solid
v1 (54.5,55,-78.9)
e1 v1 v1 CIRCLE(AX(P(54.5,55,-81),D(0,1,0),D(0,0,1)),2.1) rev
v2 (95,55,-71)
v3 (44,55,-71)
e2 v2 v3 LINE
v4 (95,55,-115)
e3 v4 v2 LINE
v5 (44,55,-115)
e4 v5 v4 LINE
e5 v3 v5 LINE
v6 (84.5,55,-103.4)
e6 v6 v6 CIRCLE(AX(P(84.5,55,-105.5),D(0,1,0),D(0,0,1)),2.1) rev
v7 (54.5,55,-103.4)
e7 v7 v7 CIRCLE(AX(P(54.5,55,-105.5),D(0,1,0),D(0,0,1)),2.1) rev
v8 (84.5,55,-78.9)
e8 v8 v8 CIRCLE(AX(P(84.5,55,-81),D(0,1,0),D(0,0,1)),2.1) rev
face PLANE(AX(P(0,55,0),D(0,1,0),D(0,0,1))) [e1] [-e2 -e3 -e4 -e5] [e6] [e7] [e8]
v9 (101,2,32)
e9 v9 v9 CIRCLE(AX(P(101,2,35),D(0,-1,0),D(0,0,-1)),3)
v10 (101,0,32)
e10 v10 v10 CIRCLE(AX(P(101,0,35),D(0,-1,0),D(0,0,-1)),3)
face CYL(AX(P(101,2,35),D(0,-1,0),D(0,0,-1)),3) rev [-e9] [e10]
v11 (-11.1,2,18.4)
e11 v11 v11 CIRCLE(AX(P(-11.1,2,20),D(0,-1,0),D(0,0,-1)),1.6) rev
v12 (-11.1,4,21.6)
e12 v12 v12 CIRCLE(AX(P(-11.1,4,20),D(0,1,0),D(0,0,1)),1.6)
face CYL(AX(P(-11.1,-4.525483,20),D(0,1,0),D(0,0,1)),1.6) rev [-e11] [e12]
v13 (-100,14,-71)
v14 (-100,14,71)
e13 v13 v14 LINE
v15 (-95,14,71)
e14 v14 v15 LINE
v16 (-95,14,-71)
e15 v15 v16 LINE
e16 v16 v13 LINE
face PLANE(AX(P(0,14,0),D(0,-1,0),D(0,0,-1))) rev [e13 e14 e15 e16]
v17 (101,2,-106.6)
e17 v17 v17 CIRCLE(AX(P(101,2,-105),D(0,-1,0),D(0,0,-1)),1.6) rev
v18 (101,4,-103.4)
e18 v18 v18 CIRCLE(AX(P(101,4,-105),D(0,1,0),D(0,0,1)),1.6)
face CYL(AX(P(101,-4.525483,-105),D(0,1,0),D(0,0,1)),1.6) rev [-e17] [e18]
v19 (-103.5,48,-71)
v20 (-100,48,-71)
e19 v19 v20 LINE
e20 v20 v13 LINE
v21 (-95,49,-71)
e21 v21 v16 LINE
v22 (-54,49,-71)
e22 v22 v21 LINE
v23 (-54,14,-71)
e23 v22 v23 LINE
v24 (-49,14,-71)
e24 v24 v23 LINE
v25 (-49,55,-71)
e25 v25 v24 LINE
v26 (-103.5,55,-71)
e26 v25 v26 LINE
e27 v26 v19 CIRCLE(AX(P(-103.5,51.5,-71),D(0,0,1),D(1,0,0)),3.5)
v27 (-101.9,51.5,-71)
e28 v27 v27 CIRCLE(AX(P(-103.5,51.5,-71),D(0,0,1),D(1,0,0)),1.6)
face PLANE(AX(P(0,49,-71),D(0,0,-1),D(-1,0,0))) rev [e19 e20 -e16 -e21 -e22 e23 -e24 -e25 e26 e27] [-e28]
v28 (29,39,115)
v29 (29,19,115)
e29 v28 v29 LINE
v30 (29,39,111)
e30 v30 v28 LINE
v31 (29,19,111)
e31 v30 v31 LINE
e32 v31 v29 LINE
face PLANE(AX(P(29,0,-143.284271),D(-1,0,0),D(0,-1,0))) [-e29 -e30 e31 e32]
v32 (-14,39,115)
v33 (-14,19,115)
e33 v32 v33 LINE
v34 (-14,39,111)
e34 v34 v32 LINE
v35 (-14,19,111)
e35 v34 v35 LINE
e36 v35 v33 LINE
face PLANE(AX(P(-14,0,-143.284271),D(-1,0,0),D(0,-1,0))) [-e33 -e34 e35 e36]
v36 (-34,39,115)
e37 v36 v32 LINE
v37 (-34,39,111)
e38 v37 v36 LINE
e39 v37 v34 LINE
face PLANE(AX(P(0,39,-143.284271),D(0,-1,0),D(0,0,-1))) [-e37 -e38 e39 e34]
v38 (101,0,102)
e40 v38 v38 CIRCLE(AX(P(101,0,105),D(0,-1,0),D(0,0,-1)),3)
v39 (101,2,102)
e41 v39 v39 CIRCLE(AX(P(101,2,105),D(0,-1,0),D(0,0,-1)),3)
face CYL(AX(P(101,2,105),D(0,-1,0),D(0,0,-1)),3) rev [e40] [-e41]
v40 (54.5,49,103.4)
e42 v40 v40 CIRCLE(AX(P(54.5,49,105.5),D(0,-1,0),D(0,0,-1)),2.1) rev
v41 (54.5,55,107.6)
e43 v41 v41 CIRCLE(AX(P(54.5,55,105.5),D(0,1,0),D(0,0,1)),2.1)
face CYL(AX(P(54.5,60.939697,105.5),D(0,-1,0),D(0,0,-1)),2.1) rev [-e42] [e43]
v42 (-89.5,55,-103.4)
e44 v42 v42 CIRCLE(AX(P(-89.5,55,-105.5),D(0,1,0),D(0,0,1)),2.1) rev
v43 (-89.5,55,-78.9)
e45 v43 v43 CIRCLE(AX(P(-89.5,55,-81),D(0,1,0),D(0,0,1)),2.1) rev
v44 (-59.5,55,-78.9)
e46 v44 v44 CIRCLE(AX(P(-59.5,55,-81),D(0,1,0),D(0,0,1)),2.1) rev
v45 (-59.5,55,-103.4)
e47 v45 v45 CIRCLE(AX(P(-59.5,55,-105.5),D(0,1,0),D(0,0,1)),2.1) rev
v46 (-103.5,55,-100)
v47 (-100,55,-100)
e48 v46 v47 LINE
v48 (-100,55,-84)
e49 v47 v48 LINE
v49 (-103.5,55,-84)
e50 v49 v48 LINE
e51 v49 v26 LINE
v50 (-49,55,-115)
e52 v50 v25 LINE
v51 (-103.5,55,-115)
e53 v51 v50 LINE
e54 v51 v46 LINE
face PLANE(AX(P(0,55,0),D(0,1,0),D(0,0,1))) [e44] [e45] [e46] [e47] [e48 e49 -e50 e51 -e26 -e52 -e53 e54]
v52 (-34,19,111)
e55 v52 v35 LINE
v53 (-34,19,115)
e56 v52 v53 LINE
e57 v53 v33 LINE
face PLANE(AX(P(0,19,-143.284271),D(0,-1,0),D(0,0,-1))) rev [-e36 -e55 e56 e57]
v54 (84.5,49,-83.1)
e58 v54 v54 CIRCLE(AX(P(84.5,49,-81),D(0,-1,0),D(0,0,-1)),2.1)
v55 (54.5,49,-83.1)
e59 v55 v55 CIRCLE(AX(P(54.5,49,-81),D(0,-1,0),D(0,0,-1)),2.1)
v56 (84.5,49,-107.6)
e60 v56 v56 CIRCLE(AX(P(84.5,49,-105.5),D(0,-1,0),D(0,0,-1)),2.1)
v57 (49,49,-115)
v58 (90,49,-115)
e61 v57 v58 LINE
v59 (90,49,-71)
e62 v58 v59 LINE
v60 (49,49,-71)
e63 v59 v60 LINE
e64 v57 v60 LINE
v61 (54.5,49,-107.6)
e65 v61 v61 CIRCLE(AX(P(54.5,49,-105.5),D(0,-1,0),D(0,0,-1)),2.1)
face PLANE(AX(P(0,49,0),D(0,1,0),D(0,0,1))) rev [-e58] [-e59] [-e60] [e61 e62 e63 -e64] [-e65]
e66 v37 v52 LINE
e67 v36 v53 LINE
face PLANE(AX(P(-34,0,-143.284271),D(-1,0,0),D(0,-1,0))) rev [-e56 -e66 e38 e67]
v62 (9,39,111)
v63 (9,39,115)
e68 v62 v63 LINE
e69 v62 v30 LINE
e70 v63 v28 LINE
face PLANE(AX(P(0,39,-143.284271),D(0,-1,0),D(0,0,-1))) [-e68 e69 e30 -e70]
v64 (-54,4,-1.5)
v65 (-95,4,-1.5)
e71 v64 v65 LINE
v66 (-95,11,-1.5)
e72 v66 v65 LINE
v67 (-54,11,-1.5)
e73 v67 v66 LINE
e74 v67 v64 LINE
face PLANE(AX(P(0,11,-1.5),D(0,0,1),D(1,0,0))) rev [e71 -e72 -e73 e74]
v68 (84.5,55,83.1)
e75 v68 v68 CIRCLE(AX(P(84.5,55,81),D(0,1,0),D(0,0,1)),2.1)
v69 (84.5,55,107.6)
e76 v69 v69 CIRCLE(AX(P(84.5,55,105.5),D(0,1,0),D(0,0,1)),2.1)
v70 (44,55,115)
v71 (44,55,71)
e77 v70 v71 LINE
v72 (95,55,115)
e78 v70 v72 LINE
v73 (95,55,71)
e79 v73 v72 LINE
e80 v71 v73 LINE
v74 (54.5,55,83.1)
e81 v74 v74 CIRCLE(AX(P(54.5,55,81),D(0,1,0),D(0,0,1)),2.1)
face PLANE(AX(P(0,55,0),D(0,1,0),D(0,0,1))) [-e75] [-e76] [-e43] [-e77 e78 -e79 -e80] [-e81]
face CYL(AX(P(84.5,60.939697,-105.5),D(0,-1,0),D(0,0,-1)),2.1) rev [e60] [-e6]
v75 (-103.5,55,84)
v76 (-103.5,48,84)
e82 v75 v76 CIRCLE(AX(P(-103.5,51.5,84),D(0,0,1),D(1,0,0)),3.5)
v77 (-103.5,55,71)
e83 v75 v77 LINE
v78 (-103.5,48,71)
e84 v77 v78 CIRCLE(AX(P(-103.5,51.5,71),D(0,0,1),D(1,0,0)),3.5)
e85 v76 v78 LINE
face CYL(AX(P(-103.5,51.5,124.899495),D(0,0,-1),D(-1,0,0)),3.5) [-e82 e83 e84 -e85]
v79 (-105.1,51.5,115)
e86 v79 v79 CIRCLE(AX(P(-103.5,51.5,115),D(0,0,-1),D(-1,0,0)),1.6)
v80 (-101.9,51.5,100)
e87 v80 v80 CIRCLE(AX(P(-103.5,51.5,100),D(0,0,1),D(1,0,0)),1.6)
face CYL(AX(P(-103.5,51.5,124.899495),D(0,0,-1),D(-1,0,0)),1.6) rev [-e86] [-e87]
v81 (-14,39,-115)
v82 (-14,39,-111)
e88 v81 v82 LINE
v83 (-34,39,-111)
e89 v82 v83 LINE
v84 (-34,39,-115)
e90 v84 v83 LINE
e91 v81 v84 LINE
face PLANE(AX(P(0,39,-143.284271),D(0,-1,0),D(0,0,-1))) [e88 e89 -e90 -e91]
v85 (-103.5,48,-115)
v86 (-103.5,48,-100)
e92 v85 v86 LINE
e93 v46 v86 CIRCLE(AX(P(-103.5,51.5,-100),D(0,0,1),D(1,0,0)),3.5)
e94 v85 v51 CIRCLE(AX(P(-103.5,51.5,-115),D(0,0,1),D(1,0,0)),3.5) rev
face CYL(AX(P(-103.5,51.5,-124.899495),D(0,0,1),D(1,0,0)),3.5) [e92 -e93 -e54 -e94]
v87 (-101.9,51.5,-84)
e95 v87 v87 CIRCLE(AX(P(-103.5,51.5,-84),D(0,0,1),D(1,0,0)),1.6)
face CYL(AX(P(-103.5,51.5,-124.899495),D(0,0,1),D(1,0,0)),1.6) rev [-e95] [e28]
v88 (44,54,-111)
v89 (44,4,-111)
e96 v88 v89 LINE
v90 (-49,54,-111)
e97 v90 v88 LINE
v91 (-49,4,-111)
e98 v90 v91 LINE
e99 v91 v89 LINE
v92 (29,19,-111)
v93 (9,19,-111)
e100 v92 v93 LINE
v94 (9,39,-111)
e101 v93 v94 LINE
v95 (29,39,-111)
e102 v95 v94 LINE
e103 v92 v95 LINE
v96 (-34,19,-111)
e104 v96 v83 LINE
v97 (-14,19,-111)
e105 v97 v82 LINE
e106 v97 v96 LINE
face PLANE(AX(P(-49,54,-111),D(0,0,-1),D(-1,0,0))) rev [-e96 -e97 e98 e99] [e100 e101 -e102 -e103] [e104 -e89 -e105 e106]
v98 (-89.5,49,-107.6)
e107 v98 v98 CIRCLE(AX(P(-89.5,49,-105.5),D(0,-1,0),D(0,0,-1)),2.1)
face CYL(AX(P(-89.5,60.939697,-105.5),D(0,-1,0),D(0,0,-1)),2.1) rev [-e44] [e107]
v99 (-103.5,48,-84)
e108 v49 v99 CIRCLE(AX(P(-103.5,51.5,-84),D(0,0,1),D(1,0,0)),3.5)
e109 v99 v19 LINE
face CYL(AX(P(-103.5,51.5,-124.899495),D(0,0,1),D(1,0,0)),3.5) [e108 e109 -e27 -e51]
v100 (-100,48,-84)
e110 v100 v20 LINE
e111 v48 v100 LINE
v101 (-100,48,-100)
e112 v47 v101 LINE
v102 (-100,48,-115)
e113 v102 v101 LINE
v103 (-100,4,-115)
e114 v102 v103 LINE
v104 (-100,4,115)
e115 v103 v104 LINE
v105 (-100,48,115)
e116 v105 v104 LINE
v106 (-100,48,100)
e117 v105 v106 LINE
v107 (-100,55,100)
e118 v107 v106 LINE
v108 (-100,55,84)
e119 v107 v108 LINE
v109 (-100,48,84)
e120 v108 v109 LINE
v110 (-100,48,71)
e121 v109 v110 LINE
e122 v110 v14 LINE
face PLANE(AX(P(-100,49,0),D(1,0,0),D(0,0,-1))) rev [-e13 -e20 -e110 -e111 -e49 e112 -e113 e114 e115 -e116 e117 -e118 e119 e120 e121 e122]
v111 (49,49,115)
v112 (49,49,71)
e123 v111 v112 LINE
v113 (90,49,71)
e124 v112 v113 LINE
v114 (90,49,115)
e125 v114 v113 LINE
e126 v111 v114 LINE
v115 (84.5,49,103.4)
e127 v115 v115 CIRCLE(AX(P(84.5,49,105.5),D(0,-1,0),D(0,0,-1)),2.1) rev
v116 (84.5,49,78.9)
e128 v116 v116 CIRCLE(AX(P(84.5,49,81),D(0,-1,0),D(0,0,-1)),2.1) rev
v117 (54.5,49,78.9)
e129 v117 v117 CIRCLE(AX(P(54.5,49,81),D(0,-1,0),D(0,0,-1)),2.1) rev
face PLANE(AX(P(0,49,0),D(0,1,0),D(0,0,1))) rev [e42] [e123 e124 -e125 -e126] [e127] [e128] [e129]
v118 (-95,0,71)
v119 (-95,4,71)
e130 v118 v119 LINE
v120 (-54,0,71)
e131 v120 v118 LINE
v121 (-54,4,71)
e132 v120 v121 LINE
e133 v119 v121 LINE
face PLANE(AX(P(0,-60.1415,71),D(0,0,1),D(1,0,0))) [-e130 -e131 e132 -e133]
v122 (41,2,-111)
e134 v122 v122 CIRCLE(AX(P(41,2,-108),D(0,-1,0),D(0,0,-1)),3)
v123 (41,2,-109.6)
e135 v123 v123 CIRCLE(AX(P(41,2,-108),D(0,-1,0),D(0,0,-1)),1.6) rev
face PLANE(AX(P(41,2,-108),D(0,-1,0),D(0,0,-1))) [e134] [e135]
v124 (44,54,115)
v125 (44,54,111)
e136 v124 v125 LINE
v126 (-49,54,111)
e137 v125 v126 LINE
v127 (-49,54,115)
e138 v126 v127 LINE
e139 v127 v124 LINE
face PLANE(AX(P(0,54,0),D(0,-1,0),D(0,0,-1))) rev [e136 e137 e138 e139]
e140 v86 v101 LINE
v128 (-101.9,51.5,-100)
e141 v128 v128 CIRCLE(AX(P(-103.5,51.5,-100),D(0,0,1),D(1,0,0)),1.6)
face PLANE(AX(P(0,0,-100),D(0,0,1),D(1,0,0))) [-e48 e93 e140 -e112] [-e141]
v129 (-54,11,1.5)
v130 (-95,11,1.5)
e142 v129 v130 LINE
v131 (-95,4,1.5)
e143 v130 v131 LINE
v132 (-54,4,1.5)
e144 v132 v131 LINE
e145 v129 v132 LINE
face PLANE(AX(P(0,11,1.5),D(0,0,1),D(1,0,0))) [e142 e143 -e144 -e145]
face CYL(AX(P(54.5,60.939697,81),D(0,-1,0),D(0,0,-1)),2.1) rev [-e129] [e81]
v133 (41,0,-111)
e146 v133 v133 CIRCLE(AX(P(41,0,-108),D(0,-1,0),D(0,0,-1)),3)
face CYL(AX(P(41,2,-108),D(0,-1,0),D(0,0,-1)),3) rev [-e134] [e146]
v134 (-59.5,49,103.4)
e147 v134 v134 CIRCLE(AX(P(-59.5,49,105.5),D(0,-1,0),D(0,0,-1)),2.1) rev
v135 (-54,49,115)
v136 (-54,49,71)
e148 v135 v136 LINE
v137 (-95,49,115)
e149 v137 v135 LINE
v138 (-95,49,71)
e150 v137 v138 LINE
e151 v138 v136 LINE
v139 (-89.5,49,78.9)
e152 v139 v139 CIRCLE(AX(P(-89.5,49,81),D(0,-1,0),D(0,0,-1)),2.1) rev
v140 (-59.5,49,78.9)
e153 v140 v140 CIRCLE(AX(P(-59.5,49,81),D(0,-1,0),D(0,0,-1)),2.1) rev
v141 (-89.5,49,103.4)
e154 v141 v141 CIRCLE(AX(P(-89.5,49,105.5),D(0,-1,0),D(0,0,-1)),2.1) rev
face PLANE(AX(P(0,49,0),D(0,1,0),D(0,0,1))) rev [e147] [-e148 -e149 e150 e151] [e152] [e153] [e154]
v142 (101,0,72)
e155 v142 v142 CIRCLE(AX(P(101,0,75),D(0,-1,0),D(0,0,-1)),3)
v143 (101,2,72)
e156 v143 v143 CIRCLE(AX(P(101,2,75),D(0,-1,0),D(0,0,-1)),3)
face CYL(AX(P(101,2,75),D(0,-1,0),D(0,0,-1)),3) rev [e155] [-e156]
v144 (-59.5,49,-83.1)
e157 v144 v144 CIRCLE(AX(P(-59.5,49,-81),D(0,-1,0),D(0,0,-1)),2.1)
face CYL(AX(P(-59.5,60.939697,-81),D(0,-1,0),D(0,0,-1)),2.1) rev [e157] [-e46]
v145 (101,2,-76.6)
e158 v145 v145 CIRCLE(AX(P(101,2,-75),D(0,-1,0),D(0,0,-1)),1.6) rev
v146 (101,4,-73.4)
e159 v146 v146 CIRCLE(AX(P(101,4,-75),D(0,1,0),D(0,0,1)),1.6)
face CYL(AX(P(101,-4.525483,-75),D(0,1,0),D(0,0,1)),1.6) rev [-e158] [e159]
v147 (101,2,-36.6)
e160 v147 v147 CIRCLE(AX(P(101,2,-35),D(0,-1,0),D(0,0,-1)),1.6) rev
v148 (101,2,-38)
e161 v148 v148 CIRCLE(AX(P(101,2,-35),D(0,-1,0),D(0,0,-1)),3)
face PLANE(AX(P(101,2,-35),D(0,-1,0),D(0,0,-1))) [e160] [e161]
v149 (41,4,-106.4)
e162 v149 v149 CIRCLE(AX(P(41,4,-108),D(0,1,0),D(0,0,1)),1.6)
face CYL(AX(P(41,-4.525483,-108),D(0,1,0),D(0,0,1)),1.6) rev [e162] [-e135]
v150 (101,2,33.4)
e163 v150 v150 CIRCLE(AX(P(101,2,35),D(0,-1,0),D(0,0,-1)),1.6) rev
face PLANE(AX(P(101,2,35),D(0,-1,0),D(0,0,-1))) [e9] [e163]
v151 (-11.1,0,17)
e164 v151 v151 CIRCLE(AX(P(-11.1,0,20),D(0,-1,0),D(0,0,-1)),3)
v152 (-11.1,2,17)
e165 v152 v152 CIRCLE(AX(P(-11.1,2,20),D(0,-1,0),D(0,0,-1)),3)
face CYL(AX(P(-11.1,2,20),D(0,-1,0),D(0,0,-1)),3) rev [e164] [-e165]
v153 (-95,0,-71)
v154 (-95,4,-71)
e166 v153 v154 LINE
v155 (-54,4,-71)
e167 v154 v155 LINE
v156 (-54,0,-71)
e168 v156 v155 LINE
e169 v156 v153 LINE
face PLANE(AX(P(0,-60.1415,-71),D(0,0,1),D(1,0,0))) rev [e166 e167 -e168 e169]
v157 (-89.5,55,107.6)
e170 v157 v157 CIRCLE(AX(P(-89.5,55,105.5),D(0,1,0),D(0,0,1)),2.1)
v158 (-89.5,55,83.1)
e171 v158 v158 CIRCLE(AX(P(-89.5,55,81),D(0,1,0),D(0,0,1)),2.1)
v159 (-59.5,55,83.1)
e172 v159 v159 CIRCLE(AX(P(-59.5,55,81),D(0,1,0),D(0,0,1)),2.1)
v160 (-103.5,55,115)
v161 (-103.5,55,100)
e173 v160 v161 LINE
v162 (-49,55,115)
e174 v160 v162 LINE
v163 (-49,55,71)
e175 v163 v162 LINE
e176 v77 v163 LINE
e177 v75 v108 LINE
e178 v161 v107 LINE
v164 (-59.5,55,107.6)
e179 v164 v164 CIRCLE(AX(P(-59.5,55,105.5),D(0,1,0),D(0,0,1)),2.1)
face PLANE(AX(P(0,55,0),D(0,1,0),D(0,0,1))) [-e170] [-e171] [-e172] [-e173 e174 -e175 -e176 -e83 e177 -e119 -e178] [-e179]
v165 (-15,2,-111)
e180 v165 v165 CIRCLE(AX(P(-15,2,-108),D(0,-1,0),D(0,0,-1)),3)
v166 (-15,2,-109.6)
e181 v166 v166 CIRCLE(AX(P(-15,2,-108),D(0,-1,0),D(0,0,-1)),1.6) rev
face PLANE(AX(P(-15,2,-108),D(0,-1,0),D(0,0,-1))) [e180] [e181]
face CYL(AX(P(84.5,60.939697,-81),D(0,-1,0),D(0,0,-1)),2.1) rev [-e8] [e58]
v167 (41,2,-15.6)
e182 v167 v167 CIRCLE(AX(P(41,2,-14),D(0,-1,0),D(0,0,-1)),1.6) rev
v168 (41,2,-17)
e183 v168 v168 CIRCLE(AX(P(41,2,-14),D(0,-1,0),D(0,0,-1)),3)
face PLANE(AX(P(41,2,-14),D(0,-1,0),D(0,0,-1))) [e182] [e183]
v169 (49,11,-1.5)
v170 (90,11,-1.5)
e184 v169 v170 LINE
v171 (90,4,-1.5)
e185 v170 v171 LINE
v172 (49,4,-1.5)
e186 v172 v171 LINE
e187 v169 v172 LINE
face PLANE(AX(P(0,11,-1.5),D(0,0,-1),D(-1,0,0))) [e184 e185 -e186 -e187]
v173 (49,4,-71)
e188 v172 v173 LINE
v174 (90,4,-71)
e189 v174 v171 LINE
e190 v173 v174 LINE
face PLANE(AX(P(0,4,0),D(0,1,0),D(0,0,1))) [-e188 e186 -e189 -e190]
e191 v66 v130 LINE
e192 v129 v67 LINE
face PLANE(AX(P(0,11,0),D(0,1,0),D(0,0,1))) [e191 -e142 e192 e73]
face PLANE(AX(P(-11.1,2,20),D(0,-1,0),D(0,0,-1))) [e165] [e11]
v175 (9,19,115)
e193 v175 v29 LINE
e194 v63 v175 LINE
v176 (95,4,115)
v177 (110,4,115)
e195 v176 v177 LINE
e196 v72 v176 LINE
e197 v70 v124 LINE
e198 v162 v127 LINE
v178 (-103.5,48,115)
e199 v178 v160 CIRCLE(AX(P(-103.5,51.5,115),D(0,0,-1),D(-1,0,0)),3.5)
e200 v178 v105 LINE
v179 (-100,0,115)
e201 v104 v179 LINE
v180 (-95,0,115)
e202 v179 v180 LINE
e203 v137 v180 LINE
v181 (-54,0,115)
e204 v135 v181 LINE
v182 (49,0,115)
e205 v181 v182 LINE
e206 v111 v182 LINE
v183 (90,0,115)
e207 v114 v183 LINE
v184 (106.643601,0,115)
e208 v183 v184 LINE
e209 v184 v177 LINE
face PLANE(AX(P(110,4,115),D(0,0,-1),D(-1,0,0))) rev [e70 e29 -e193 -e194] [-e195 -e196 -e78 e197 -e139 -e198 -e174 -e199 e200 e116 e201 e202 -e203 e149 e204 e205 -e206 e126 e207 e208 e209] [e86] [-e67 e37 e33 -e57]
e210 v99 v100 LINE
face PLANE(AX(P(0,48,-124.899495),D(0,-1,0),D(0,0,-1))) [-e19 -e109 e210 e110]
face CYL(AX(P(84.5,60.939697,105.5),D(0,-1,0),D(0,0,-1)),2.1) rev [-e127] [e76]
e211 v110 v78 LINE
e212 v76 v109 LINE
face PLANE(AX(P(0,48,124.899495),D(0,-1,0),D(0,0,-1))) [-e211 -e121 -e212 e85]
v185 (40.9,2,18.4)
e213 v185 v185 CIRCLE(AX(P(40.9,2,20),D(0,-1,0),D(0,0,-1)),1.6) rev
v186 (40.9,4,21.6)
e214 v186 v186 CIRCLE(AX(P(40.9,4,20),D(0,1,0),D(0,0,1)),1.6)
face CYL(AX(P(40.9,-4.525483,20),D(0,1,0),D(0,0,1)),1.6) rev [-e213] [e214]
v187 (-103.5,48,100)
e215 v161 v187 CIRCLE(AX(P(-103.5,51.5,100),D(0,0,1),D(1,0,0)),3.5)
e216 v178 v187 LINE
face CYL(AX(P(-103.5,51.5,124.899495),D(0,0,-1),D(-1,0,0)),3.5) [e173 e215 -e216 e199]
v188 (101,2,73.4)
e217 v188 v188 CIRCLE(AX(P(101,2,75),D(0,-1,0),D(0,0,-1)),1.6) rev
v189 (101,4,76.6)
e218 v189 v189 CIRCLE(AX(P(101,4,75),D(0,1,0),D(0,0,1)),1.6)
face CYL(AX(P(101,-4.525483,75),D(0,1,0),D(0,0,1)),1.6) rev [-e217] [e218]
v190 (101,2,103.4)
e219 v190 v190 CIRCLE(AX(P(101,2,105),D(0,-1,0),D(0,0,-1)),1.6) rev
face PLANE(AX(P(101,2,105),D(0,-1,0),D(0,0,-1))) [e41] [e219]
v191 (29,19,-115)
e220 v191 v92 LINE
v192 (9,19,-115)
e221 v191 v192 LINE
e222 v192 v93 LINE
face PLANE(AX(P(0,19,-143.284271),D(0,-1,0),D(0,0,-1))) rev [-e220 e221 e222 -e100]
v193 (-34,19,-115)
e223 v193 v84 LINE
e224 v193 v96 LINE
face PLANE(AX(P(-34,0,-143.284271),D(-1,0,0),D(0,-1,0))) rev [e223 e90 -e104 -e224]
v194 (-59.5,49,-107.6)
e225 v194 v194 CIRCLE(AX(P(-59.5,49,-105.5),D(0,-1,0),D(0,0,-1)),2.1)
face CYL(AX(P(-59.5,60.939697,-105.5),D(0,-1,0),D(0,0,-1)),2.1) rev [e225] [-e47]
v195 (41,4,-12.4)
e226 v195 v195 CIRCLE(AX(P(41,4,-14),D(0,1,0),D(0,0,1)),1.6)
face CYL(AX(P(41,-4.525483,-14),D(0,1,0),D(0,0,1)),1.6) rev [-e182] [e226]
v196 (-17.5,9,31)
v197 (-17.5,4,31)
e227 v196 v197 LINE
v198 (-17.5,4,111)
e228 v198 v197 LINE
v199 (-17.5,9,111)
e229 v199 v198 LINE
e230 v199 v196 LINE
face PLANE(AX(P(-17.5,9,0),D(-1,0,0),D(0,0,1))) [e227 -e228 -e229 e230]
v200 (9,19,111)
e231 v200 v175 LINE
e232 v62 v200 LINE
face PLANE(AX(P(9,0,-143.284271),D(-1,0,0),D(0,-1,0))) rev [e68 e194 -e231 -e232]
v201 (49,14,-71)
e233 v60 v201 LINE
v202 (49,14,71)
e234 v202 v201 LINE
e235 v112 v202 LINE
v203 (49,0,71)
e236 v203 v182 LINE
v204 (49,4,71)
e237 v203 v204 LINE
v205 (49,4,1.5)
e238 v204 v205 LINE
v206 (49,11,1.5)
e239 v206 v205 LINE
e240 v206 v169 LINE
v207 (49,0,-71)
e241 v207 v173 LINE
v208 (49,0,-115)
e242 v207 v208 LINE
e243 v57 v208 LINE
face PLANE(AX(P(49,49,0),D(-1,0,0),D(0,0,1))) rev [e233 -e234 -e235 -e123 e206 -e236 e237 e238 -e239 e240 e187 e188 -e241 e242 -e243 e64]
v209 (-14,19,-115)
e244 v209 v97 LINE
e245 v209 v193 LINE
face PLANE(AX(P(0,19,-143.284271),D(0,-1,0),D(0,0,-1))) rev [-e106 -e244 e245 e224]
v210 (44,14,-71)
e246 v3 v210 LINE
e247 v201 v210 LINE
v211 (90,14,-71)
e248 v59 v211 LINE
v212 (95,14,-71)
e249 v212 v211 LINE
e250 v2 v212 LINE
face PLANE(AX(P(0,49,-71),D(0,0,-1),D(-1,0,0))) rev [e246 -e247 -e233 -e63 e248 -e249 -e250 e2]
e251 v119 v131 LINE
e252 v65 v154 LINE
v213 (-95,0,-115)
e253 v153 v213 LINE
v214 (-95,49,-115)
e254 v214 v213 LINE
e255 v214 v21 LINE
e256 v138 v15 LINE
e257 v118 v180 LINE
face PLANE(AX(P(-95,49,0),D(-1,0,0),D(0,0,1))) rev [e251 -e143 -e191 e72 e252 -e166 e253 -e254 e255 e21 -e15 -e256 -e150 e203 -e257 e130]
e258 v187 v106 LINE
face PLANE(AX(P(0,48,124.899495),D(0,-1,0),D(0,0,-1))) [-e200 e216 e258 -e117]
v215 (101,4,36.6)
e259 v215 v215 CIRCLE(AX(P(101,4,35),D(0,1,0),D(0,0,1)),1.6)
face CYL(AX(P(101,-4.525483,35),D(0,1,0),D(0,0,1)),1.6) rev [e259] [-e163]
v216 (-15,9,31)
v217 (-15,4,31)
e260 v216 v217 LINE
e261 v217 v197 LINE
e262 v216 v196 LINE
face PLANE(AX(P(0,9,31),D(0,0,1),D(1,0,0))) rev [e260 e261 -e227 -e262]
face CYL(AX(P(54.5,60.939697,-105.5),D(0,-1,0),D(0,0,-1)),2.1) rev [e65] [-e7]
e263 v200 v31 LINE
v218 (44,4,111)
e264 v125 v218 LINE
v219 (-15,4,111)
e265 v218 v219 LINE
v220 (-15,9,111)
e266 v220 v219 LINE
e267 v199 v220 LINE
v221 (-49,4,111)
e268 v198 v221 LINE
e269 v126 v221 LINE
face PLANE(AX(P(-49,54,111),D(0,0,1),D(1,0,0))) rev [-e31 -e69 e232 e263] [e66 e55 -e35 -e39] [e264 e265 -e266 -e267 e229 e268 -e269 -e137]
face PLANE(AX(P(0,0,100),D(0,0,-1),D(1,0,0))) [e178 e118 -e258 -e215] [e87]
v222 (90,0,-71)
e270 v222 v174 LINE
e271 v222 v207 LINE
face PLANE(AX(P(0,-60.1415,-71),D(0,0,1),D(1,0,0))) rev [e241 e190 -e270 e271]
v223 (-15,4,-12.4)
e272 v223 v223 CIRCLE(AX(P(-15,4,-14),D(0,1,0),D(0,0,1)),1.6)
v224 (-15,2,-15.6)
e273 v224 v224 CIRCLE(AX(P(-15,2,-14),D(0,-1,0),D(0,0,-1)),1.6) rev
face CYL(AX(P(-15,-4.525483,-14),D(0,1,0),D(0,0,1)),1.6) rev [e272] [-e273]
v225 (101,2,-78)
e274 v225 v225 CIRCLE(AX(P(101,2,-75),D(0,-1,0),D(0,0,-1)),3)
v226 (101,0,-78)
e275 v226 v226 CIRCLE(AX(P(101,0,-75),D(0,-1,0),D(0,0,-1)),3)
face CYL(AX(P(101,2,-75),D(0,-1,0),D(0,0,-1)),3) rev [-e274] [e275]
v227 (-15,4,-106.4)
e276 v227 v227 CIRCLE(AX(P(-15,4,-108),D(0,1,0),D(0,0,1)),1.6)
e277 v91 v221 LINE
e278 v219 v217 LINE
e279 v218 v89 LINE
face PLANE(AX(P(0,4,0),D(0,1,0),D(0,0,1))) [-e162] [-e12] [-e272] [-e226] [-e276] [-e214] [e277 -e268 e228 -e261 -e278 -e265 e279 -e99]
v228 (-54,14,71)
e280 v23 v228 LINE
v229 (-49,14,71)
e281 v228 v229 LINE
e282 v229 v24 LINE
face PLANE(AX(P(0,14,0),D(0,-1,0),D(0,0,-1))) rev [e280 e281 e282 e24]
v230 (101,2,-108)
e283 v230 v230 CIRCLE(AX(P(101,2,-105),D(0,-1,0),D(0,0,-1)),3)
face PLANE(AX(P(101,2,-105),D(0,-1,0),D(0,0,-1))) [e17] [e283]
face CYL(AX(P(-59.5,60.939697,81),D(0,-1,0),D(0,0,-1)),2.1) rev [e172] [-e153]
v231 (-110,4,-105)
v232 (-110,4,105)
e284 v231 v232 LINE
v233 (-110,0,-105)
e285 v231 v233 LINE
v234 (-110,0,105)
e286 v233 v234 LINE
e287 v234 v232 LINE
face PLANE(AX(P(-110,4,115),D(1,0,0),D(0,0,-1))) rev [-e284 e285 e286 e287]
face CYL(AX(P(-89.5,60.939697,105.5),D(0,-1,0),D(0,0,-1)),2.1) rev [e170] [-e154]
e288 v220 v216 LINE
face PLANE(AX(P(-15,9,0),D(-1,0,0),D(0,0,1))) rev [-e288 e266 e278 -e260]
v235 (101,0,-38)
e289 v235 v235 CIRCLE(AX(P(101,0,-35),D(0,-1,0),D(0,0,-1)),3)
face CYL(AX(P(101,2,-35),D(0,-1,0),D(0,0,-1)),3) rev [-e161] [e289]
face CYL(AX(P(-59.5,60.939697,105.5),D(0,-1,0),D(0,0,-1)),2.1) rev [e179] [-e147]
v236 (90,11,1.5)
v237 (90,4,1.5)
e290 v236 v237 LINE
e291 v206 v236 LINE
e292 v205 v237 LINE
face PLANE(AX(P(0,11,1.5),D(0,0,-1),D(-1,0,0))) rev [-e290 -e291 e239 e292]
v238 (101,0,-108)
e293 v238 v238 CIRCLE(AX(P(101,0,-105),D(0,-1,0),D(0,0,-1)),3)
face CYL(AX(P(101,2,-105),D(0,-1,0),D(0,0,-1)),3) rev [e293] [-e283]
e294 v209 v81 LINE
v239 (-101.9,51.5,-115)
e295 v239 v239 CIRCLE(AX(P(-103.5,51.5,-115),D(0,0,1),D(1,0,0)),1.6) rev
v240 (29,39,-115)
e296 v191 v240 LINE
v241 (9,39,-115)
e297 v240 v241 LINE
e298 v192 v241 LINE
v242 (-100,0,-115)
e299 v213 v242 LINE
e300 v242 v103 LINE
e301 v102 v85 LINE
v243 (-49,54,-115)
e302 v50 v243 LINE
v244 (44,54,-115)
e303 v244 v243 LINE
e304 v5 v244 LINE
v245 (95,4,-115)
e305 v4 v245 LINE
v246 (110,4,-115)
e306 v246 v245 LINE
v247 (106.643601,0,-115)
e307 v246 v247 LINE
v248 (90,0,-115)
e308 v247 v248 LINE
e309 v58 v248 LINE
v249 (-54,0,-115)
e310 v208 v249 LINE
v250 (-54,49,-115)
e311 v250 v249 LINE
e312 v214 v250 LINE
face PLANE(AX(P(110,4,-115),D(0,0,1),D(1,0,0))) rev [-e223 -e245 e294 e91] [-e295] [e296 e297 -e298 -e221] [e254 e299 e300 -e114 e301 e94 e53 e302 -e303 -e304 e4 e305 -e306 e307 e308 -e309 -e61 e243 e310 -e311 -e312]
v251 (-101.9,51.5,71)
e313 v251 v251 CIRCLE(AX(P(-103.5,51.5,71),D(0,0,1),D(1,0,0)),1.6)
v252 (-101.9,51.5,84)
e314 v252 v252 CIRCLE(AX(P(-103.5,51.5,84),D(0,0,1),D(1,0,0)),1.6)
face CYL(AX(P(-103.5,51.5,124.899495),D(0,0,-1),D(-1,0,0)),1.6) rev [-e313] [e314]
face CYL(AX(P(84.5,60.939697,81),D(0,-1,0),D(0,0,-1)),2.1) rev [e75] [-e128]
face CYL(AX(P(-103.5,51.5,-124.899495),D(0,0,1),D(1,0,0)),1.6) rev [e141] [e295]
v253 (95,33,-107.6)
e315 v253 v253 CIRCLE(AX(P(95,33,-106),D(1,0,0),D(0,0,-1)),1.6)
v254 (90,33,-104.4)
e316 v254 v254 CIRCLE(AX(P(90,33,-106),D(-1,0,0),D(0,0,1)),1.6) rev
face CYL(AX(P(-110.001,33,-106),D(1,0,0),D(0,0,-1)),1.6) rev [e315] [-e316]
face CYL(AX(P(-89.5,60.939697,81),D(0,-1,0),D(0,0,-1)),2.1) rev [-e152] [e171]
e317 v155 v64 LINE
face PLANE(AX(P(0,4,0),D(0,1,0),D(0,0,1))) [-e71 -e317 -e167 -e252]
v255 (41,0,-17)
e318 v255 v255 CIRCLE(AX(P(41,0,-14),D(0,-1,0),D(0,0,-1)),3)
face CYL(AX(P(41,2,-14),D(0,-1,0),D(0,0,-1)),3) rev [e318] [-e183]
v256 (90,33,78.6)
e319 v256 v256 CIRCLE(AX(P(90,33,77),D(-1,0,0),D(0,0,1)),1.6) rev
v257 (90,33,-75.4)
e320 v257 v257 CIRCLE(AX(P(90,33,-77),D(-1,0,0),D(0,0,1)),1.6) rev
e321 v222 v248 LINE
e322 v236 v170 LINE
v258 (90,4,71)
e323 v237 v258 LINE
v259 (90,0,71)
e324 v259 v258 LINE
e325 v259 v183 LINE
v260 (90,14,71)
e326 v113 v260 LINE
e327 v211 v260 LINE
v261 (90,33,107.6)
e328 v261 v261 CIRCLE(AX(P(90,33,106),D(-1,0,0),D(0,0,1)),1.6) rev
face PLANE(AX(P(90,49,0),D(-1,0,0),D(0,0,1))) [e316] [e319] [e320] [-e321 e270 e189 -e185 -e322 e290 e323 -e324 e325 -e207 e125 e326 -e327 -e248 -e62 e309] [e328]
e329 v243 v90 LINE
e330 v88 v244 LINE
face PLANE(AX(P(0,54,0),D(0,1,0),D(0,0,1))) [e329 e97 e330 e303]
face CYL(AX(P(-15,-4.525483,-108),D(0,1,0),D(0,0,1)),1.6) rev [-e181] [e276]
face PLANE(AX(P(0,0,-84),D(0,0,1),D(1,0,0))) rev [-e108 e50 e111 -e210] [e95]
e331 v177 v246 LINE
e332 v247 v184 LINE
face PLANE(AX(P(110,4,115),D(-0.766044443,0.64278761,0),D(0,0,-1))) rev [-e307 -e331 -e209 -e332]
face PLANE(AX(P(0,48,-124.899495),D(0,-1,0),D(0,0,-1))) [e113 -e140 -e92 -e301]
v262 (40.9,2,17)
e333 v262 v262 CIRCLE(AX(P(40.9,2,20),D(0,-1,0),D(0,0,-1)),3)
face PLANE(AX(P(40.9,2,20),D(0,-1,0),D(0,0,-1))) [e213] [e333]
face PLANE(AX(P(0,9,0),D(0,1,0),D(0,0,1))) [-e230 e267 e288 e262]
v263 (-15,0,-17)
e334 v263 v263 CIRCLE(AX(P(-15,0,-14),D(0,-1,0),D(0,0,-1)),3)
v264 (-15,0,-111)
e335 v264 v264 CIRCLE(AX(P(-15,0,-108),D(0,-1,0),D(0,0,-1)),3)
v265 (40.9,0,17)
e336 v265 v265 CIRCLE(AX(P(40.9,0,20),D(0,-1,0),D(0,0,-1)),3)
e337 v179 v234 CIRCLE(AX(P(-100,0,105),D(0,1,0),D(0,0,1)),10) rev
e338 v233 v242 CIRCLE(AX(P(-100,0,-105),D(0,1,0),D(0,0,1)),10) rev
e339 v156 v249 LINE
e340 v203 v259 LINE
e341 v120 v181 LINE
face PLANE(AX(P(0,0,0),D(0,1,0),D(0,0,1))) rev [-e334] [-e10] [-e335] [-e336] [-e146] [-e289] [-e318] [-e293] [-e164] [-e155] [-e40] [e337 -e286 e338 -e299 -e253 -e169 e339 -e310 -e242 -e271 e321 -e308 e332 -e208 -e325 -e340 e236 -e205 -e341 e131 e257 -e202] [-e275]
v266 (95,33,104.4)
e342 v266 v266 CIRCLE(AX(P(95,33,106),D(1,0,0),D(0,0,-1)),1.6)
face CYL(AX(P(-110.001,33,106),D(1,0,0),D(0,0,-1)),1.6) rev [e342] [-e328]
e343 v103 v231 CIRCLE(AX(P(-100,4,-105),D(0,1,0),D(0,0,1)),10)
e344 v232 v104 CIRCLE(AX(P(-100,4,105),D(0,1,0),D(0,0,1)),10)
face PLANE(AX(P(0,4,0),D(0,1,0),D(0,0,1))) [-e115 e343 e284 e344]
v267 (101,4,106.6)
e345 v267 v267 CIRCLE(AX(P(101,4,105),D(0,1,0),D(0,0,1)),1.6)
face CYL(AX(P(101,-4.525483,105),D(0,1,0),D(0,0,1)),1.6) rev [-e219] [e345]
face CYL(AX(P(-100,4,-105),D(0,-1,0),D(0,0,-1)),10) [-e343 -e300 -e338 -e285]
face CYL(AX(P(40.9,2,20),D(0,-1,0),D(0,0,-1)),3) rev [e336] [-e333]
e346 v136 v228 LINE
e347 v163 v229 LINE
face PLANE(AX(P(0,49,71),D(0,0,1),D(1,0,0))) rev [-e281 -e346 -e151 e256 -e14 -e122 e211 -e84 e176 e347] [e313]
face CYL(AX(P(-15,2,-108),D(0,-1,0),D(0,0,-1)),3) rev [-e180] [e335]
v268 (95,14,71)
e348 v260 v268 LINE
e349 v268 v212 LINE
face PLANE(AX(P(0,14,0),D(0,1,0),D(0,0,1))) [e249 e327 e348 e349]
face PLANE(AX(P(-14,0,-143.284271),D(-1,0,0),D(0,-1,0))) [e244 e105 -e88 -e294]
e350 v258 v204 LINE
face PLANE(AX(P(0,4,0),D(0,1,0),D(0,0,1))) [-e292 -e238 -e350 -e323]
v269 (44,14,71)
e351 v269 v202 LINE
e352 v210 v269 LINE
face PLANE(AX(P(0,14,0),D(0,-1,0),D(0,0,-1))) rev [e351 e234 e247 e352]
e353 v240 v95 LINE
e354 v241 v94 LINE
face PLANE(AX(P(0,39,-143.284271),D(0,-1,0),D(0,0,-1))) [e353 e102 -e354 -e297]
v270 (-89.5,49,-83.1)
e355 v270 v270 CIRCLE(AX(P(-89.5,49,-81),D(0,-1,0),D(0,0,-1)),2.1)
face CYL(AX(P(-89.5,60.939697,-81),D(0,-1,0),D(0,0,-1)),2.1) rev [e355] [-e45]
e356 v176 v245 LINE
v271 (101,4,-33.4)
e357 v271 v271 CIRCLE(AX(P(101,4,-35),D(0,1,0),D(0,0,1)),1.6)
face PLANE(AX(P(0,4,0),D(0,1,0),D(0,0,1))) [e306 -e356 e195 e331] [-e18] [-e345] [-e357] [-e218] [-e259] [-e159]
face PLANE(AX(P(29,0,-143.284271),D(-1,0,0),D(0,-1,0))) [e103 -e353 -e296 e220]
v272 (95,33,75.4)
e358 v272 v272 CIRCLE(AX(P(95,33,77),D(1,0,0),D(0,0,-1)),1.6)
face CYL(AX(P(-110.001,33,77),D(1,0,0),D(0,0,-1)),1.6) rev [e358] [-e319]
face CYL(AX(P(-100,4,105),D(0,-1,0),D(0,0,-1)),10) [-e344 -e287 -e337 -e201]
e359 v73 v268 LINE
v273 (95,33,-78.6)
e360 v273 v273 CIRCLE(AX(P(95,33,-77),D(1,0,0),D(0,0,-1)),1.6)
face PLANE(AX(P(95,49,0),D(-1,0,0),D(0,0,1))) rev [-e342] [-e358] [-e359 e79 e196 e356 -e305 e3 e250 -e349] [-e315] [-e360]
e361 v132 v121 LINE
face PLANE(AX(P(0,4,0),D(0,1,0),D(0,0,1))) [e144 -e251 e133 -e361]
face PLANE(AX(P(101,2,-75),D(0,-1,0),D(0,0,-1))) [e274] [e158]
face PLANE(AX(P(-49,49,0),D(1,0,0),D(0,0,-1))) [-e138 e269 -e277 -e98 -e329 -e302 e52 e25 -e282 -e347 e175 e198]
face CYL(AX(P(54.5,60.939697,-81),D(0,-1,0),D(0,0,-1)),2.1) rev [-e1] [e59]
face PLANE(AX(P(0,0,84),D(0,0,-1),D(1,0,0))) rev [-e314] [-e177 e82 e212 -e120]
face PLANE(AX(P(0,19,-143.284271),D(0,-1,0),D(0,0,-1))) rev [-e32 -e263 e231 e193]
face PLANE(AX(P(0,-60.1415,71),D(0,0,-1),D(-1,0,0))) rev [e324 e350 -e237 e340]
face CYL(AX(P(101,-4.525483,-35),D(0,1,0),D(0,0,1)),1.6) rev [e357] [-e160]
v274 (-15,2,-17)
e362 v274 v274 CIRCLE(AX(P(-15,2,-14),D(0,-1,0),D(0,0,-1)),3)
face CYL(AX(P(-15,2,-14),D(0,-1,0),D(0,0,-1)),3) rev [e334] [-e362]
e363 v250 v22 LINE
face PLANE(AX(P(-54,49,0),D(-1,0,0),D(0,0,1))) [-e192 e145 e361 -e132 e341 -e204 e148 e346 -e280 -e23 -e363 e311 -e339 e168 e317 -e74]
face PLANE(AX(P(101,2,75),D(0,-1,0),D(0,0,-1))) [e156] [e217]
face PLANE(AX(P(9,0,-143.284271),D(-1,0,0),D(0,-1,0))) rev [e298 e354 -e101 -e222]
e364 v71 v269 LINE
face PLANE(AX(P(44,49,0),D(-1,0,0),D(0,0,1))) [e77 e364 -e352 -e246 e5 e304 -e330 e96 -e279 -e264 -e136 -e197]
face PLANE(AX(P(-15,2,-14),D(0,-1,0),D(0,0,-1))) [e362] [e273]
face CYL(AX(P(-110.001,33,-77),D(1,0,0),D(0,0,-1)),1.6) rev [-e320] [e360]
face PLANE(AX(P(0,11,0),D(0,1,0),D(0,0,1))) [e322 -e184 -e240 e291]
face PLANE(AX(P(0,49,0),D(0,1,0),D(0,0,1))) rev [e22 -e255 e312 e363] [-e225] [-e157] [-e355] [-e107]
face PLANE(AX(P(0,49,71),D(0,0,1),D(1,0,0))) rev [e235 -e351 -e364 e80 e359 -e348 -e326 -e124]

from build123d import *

# Parameters (mm, degrees)
SKETCH_1_W                       = 220
SKETCH_1_H                       = 230
EXTRUDE_1_DEPTH                  = 4
SKETCH_2_W                       = 5
SKETCH_2_H                       = 44
EXTRUDE_2_DEPTH                  = 45
SKETCH_2_3_W                     = 41
SKETCH_2_3_H                     = 44
CUT_EXTRUDE_1_DEPTH              = 4
EXTRUDE_3_DEPTH                  = 6
SKETCH_4_R                       = 2.1
CUT_EXTRUDE_2_DEPTH              = 6
SKETCH_10_W                      = 93
SKETCH_10_H                      = 4
EXTRUDE_8_DEPTH                  = 50
SKETCH_11_W                      = 5
SKETCH_11_H                      = 142
EXTRUDE_9_DEPTH                  = 10
SKETCH_13_W                      = 41
SKETCH_13_H                      = 1.5
EXTRUDE_11_DEPTH                 = 7
SKETCH_17_R                      = 1.6
CUT_EXTRUDE_7_DEPTH              = 4
CHAMFER_3_SIZE2                  = 4
CHAMFER_3_SIZE                   = 3.356398525
CUT_EXTRUDE_11_REACH             = 259.296
SKETCH_21_W                      = 20
SKETCH_21_H                      = 20
CUT_EXTRUDE_11_DIRECTION_2_DEPTH = 258.295549903
SKETCH_23_R                      = 1.6
EXTRUDE_13_DEPTH                 = 44
CUT_EXTRUDE_START                = -13
SKETCH_23_4_R                    = 1.6
CUT_EXTRUDE_13_DEPTH             = 16
EXTRUDE_START                    = 186
SKETCH_23_5_R                    = 1.6
EXTRUDE_14_DEPTH                 = 44
SKETCH_24_W                      = 2.5
SKETCH_24_H                      = 80
EXTRUDE_15_DEPTH                 = 5
SKETCH_25_R                      = 1.6
CUT_EXTRUDE_15_DEPTH             = 4
FILLET_1_R                       = 10
SKETCH_26_R                      = 1.6
CUT_EXTRUDE_16_DEPTH             = 4
SKETCH_27_R                      = 3
CUT_EXTRUDE_17_DEPTH             = 2
CUT_EXTRUDE_18_REACH             = 243.402
SKETCH_28_R                      = 1.6


with BuildPart() as part:
    # 草图1 → 凸台-拉伸1 (new body)
    with BuildSketch(Plane(origin=(0, 0, 0), x_dir=(1, 0, 0), z_dir=(0, 1, 0))):
        Rectangle(SKETCH_1_W, SKETCH_1_H)
    extrude(amount=EXTRUDE_1_DEPTH)

    # 草图2 → 凸台-拉伸2 (add)
    with BuildSketch(Plane(origin=(0, 4, 0), x_dir=(1, 0, 0), z_dir=(0, 1, 0))):
        with Locations((-97.5, -93)):
            Rectangle(SKETCH_2_W, SKETCH_2_H)
        with Locations((-51.5, -93)):
            Rectangle(SKETCH_2_W, SKETCH_2_H)
        with Locations((46.5, -93)):
            Rectangle(SKETCH_2_W, SKETCH_2_H)
        with Locations((92.5, -93)):
            Rectangle(SKETCH_2_W, SKETCH_2_H)
        with Locations((92.5, 93)):
            Rectangle(SKETCH_2_W, SKETCH_2_H)
        with Locations((46.5, 93)):
            Rectangle(SKETCH_2_W, SKETCH_2_H)
        with Locations((-51.5, 93)):
            Rectangle(SKETCH_2_W, SKETCH_2_H)
        with Locations((-97.5, 93)):
            Rectangle(SKETCH_2_W, SKETCH_2_H)
    extrude(amount=EXTRUDE_2_DEPTH)

    # 草图2<3> → 切除-拉伸1 (cut)
    with BuildSketch(Plane(origin=(0, 4, 0), x_dir=(1, 0, 0), z_dir=(0, 1, 0))):
        with Locations((-74.5, -93)):
            Rectangle(SKETCH_2_3_W, SKETCH_2_3_H)
        with Locations((69.5, -93)):
            Rectangle(SKETCH_2_3_W, SKETCH_2_3_H)
        with Locations((-74.5, 93)):
            Rectangle(SKETCH_2_3_W, SKETCH_2_3_H)
        with Locations((69.5, 93)):
            Rectangle(SKETCH_2_3_W, SKETCH_2_3_H)
    extrude(amount=-CUT_EXTRUDE_1_DEPTH, mode=Mode.SUBTRACT)

    # 草图3 → 凸台-拉伸3 (add)
    with BuildSketch(Plane(origin=(0, 49, 0), x_dir=(1, 0, 0), z_dir=(0, 1, 0))):
        Polygon((-100, -71), (-100, -115), (-49, -115), (-49, -71), (-54, -71), (-95, -71), align=None)
        Polygon((-49, 115), (-100, 115), (-100, 71), (-95, 71), (-54, 71), (-49, 71), align=None)
        Polygon((59, 115), (44, 115), (44, 71), (49, 71), (90, 71), (95, 71), (95, 115), align=None)
        Polygon((44, -71), (44, -115), (59, -115), (95, -115), (95, -71), (90, -71), (49, -71), align=None)
    extrude(amount=EXTRUDE_3_DEPTH)

    # 草图4 → 切除-拉伸2 (cut)
    with BuildSketch(Plane.XZ.offset(-49)):
        with Locations(Location((84.5, 105.5, 0), (0, 0, 270))):
            Circle(SKETCH_4_R)
        with Locations(Location((84.5, 81, 0), (0, 0, 270))):
            Circle(SKETCH_4_R)
        with Locations(Location((54.5, 105.5, 0), (0, 0, 270))):
            Circle(SKETCH_4_R)
        with Locations(Location((54.5, 81, 0), (0, 0, 270))):
            Circle(SKETCH_4_R)
        with Locations(Location((-59.5, 105.5, 0), (0, 0, 270))):
            Circle(SKETCH_4_R)
        with Locations(Location((-59.5, 81, 0), (0, 0, 270))):
            Circle(SKETCH_4_R)
        with Locations(Location((-89.5, 105.5, 0), (0, 0, 270))):
            Circle(SKETCH_4_R)
        with Locations(Location((-89.5, 81, 0), (0, 0, 270))):
            Circle(SKETCH_4_R)
        with Locations(Location((-89.5, -81, 0), (0, 0, 270))):
            Circle(SKETCH_4_R)
        with Locations(Location((-89.5, -105.5, 0), (0, 0, 270))):
            Circle(SKETCH_4_R)
        with Locations(Location((-59.5, -105.5, 0), (0, 0, 270))):
            Circle(SKETCH_4_R)
        with Locations(Location((-59.5, -81, 0), (0, 0, 270))):
            Circle(SKETCH_4_R)
        with Locations(Location((54.5, -81, 0), (0, 0, 270))):
            Circle(SKETCH_4_R)
        with Locations(Location((54.5, -105.5, 0), (0, 0, 270))):
            Circle(SKETCH_4_R)
        with Locations(Location((84.5, -105.5, 0), (0, 0, 270))):
            Circle(SKETCH_4_R)
        with Locations(Location((84.5, -81, 0), (0, 0, 270))):
            Circle(SKETCH_4_R)
    extrude(amount=-CUT_EXTRUDE_2_DEPTH, mode=Mode.SUBTRACT)

    # 草图10 → 凸台-拉伸8 (add)
    with BuildSketch(Plane(origin=(0, 4, 0), x_dir=(1, 0, 0), z_dir=(0, 1, 0))):
        with Locations((-2.5, -113)):
            Rectangle(SKETCH_10_W, SKETCH_10_H)
        with Locations((-2.5, 113)):
            Rectangle(SKETCH_10_W, SKETCH_10_H)
    extrude(amount=EXTRUDE_8_DEPTH)

    # 草图11 → 凸台-拉伸9 (add)
    with BuildSketch(Plane(origin=(0, 4, 0), x_dir=(1, 0, 0), z_dir=(0, 1, 0))):
        with Locations((-51.5, 0)):
            Rectangle(SKETCH_11_W, SKETCH_11_H)
        with Locations((92.5, 0)):
            Rectangle(SKETCH_11_W, SKETCH_11_H)
        with Locations((-97.5, 0)):
            Rectangle(SKETCH_11_W, SKETCH_11_H)
        with Locations((46.5, 0)):
            Rectangle(SKETCH_11_W, SKETCH_11_H)
    extrude(amount=EXTRUDE_9_DEPTH)

    # 草图13 → 凸台-拉伸11 (add)
    with BuildSketch(Plane(origin=(0, 4, 0), x_dir=(1, 0, 0), z_dir=(0, 1, 0))):
        with Locations((-74.5, -0.75)):
            Rectangle(SKETCH_13_W, SKETCH_13_H)
        with Locations((-74.5, 0.75)):
            Rectangle(SKETCH_13_W, SKETCH_13_H)
        with Locations((69.5, 0.75)):
            Rectangle(SKETCH_13_W, SKETCH_13_H)
        with Locations((69.5, -0.75)):
            Rectangle(SKETCH_13_W, SKETCH_13_H)
    extrude(amount=EXTRUDE_11_DEPTH)

    # 草图17 → 切除-拉伸7 (cut)
    with BuildSketch(Plane(origin=(0, 4, 0), x_dir=(1, 0, 0), z_dir=(0, 1, 0))):
        with Locations(Location((101, -35, 0), (0, 0, 270))):
            Circle(SKETCH_17_R)
        with Locations(Location((101, -75, 0), (0, 0, 270))):
            Circle(SKETCH_17_R)
        with Locations(Location((101, -105, 0), (0, 0, 270))):
            Circle(SKETCH_17_R)
        with Locations(Location((101, 35, 0), (0, 0, 270))):
            Circle(SKETCH_17_R)
        with Locations(Location((101, 75, 0), (0, 0, 270))):
            Circle(SKETCH_17_R)
        with Locations(Location((101, 105, 0), (0, 0, 270))):
            Circle(SKETCH_17_R)
    extrude(amount=-CUT_EXTRUDE_7_DEPTH, mode=Mode.SUBTRACT)

    # 倒角3
    chamfer_3_edges = [part.edges().sort_by_distance(p)[0] for p in [
        (110, 0, 0),
    ]]
    chamfer_3_side = [part.faces().sort_by_distance(p)[0] for p in [
        (109.93287203, 0, 0),
    ]]
    chamfer(chamfer_3_edges, length=CHAMFER_3_SIZE - 0.0001, length2=CHAMFER_3_SIZE2 - 0.0001, reference=chamfer_3_side[0])  # a hair under: the kernel refuses the full size

    # 切除-拉伸11: up to this face of the body (flat: up to its plane)
    cut_extrude_11_end = Plane(part.part.faces().sort_by_distance((-2.283465174, 28.568784072, -115))[0])
    # 草图21 → 切除-拉伸11 (cut, up to the picked face)
    with BuildSketch(Plane.XY.offset(-111), mode=Mode.PRIVATE) as cut_extrude_11_sk1:
        with Locations((-24, 29)):
            Rectangle(SKETCH_21_W, SKETCH_21_H)
    cut_extrude_11_tool1 = split(extrude(cut_extrude_11_sk1.sketch, amount=-CUT_EXTRUDE_11_REACH, mode=Mode.PRIVATE), bisect_by=cut_extrude_11_end, keep=Keep.BOTH, mode=Mode.PRIVATE)
    # 草图21 → 切除-拉伸11 (cut, up to the picked face)
    with BuildSketch(Plane.XY.offset(-111), mode=Mode.PRIVATE) as cut_extrude_11_sk2:
        with Locations((19, 29)):
            Rectangle(SKETCH_21_W, SKETCH_21_H)
    cut_extrude_11_tool2 = split(extrude(cut_extrude_11_sk2.sketch, amount=-CUT_EXTRUDE_11_REACH, mode=Mode.PRIVATE), bisect_by=cut_extrude_11_end, keep=Keep.BOTH, mode=Mode.PRIVATE)
    add(cut_extrude_11_tool1.solids().sort_by(Axis((-24, 29, -111), (0, 0, -1)))[0], mode=Mode.SUBTRACT)
    add(cut_extrude_11_tool2.solids().sort_by(Axis((19, 29, -111), (0, 0, -1)))[0], mode=Mode.SUBTRACT)

    # 草图21 → 切除-拉伸11 direction 2 (cut)
    with BuildSketch(Plane.XY.offset(-111)):
        with Locations((-24, 29)):
            Rectangle(SKETCH_21_W, SKETCH_21_H)
        with Locations((19, 29)):
            Rectangle(SKETCH_21_W, SKETCH_21_H)
    extrude(amount=CUT_EXTRUDE_11_DIRECTION_2_DEPTH, mode=Mode.SUBTRACT)

    # 草图23 → 凸台-拉伸13 (add)
    with BuildSketch(Plane.XY.offset(-71)):
        with BuildLine():
            Line((-100, 55), (-103.5, 55))
            ThreePointArc((-103.5, 55), (-107, 51.5), (-103.5, 48))
            Line((-103.5, 48), (-100, 48))
            Line((-100, 48), (-100, 55))
        make_face()
        with Locations((-103.5, 51.5)):
            Circle(SKETCH_23_R, mode=Mode.SUBTRACT)
    extrude(amount=-EXTRUDE_13_DEPTH)

    # 草图23<4> → 切除-拉伸13 (cut)
    with BuildSketch(Plane.XY.offset(-71).offset(CUT_EXTRUDE_START)):
        with BuildLine():
            Line((-100, 55), (-103.5, 55))
            ThreePointArc((-103.5, 55), (-107, 51.5), (-103.5, 48))
            Line((-103.5, 48), (-100, 48))
            Line((-100, 48), (-100, 55))
        make_face()
        with Locations((-103.5, 51.5)):
            Circle(SKETCH_23_4_R, mode=Mode.SUBTRACT)
    cut_extrude_13 = extrude(amount=-CUT_EXTRUDE_13_DEPTH, mode=Mode.SUBTRACT)

    # 草图23<5> → 凸台-拉伸14 (add)
    with BuildSketch(Plane.XY.offset(-71).offset(EXTRUDE_START)):
        with BuildLine():
            Line((-100, 55), (-103.5, 55))
            ThreePointArc((-103.5, 55), (-107, 51.5), (-103.5, 48))
            Line((-103.5, 48), (-100, 48))
            Line((-100, 48), (-100, 55))
        make_face()
        with Locations((-103.5, 51.5)):
            Circle(SKETCH_23_5_R, mode=Mode.SUBTRACT)
    extrude(amount=-EXTRUDE_14_DEPTH)

    # 草图24 → 凸台-拉伸15 (add)
    with BuildSketch(Plane(origin=(0, 4, 0), x_dir=(1, 0, 0), z_dir=(0, 1, 0))):
        with Locations((-16.25, -71)):
            Rectangle(SKETCH_24_W, SKETCH_24_H)
    extrude(amount=EXTRUDE_15_DEPTH)

    # 草图25 → 切除-拉伸15 (cut)
    with BuildSketch(Plane(origin=(0, 4, 0), x_dir=(1, 0, 0), z_dir=(0, 1, 0))):
        with Locations(Location((40.9, -20, 0), (0, 0, 270))):
            Circle(SKETCH_25_R)
        with Locations(Location((-11.1, -20, 0), (0, 0, 270))):
            Circle(SKETCH_25_R)
    extrude(amount=-CUT_EXTRUDE_15_DEPTH, mode=Mode.SUBTRACT)

    # 镜向6: 切除-拉伸13 across plane
    add(cut_extrude_13.mirror(Plane.XY), mode=Mode.SUBTRACT)

    # 圆角1
    fillet_1_edges = [part.edges().sort_by_distance(p)[0] for p in [
        (-110, 2, 115),
        (-110, 2, -115),
    ]]
    fillet(fillet_1_edges, radius=FILLET_1_R)

    # 草图26 → 切除-拉伸16 (cut)
    with BuildSketch(Plane(origin=(0, 4, 0), x_dir=(1, 0, 0), z_dir=(0, 1, 0))):
        with Locations(Location((41, 108, 0), (0, 0, 270))):
            Circle(SKETCH_26_R)
        with Locations(Location((41, 14, 0), (0, 0, 270))):
            Circle(SKETCH_26_R)
        with Locations(Location((-15, 14, 0), (0, 0, 270))):
            Circle(SKETCH_26_R)
        with Locations(Location((-15, 108, 0), (0, 0, 270))):
            Circle(SKETCH_26_R)
    extrude(amount=-CUT_EXTRUDE_16_DEPTH, mode=Mode.SUBTRACT)

    # 草图27 → 切除-拉伸17 (cut)
    with BuildSketch(Plane.XZ):
        with Locations(Location((101, 105, 0), (0, 0, 270))):
            Circle(SKETCH_27_R)
        with Locations(Location((101, 75, 0), (0, 0, 270))):
            Circle(SKETCH_27_R)
        with Locations(Location((101, 35, 0), (0, 0, 270))):
            Circle(SKETCH_27_R)
        with Locations(Location((101, -35, 0), (0, 0, 270))):
            Circle(SKETCH_27_R)
        with Locations(Location((101, -75, 0), (0, 0, 270))):
            Circle(SKETCH_27_R)
        with Locations(Location((101, -105, 0), (0, 0, 270))):
            Circle(SKETCH_27_R)
        with Locations(Location((40.9, 20, 0), (0, 0, 270))):
            Circle(SKETCH_27_R)
        with Locations(Location((41, -14, 0), (0, 0, 270))):
            Circle(SKETCH_27_R)
        with Locations(Location((41, -108, 0), (0, 0, 270))):
            Circle(SKETCH_27_R)
        with Locations(Location((-11.1, 20, 0), (0, 0, 270))):
            Circle(SKETCH_27_R)
        with Locations(Location((-15, -14, 0), (0, 0, 270))):
            Circle(SKETCH_27_R)
        with Locations(Location((-15, -108, 0), (0, 0, 270))):
            Circle(SKETCH_27_R)
    extrude(amount=-CUT_EXTRUDE_17_DEPTH, mode=Mode.SUBTRACT)

    # 草图28 → 切除-拉伸18 (cut, up to next)
    with BuildSketch(Plane(origin=(95, 0, 0), x_dir=(0, 0, -1), z_dir=(1, 0, 0)), mode=Mode.PRIVATE) as cut_extrude_18_sk1:
        with Locations((-106, 33)):
            Circle(SKETCH_28_R)
    cut_extrude_18_tool1 = extrude(cut_extrude_18_sk1.sketch, amount=-CUT_EXTRUDE_18_REACH, mode=Mode.PRIVATE) & part.part
    # 草图28 → 切除-拉伸18 (cut, up to next)
    with BuildSketch(Plane(origin=(95, 0, 0), x_dir=(0, 0, -1), z_dir=(1, 0, 0)), mode=Mode.PRIVATE) as cut_extrude_18_sk2:
        with Locations((-77, 33)):
            Circle(SKETCH_28_R)
    cut_extrude_18_tool2 = extrude(cut_extrude_18_sk2.sketch, amount=-CUT_EXTRUDE_18_REACH, mode=Mode.PRIVATE) & part.part
    # 草图28 → 切除-拉伸18 (cut, up to next)
    with BuildSketch(Plane(origin=(95, 0, 0), x_dir=(0, 0, -1), z_dir=(1, 0, 0)), mode=Mode.PRIVATE) as cut_extrude_18_sk3:
        with Locations((77, 33)):
            Circle(SKETCH_28_R)
    cut_extrude_18_tool3 = extrude(cut_extrude_18_sk3.sketch, amount=-CUT_EXTRUDE_18_REACH, mode=Mode.PRIVATE) & part.part
    # 草图28 → 切除-拉伸18 (cut, up to next)
    with BuildSketch(Plane(origin=(95, 0, 0), x_dir=(0, 0, -1), z_dir=(1, 0, 0)), mode=Mode.PRIVATE) as cut_extrude_18_sk4:
        with Locations((106, 33)):
            Circle(SKETCH_28_R)
    cut_extrude_18_tool4 = extrude(cut_extrude_18_sk4.sketch, amount=-CUT_EXTRUDE_18_REACH, mode=Mode.PRIVATE) & part.part
    add(cut_extrude_18_tool1.solids().sort_by_distance((95, 33, 106))[0], mode=Mode.SUBTRACT)
    add(cut_extrude_18_tool2.solids().sort_by_distance((95, 33, 77))[0], mode=Mode.SUBTRACT)
    add(cut_extrude_18_tool3.solids().sort_by_distance((95, 33, -77))[0], mode=Mode.SUBTRACT)
    add(cut_extrude_18_tool4.solids().sort_by_distance((95, 33, -106))[0], mode=Mode.SUBTRACT)


solid = part.part
